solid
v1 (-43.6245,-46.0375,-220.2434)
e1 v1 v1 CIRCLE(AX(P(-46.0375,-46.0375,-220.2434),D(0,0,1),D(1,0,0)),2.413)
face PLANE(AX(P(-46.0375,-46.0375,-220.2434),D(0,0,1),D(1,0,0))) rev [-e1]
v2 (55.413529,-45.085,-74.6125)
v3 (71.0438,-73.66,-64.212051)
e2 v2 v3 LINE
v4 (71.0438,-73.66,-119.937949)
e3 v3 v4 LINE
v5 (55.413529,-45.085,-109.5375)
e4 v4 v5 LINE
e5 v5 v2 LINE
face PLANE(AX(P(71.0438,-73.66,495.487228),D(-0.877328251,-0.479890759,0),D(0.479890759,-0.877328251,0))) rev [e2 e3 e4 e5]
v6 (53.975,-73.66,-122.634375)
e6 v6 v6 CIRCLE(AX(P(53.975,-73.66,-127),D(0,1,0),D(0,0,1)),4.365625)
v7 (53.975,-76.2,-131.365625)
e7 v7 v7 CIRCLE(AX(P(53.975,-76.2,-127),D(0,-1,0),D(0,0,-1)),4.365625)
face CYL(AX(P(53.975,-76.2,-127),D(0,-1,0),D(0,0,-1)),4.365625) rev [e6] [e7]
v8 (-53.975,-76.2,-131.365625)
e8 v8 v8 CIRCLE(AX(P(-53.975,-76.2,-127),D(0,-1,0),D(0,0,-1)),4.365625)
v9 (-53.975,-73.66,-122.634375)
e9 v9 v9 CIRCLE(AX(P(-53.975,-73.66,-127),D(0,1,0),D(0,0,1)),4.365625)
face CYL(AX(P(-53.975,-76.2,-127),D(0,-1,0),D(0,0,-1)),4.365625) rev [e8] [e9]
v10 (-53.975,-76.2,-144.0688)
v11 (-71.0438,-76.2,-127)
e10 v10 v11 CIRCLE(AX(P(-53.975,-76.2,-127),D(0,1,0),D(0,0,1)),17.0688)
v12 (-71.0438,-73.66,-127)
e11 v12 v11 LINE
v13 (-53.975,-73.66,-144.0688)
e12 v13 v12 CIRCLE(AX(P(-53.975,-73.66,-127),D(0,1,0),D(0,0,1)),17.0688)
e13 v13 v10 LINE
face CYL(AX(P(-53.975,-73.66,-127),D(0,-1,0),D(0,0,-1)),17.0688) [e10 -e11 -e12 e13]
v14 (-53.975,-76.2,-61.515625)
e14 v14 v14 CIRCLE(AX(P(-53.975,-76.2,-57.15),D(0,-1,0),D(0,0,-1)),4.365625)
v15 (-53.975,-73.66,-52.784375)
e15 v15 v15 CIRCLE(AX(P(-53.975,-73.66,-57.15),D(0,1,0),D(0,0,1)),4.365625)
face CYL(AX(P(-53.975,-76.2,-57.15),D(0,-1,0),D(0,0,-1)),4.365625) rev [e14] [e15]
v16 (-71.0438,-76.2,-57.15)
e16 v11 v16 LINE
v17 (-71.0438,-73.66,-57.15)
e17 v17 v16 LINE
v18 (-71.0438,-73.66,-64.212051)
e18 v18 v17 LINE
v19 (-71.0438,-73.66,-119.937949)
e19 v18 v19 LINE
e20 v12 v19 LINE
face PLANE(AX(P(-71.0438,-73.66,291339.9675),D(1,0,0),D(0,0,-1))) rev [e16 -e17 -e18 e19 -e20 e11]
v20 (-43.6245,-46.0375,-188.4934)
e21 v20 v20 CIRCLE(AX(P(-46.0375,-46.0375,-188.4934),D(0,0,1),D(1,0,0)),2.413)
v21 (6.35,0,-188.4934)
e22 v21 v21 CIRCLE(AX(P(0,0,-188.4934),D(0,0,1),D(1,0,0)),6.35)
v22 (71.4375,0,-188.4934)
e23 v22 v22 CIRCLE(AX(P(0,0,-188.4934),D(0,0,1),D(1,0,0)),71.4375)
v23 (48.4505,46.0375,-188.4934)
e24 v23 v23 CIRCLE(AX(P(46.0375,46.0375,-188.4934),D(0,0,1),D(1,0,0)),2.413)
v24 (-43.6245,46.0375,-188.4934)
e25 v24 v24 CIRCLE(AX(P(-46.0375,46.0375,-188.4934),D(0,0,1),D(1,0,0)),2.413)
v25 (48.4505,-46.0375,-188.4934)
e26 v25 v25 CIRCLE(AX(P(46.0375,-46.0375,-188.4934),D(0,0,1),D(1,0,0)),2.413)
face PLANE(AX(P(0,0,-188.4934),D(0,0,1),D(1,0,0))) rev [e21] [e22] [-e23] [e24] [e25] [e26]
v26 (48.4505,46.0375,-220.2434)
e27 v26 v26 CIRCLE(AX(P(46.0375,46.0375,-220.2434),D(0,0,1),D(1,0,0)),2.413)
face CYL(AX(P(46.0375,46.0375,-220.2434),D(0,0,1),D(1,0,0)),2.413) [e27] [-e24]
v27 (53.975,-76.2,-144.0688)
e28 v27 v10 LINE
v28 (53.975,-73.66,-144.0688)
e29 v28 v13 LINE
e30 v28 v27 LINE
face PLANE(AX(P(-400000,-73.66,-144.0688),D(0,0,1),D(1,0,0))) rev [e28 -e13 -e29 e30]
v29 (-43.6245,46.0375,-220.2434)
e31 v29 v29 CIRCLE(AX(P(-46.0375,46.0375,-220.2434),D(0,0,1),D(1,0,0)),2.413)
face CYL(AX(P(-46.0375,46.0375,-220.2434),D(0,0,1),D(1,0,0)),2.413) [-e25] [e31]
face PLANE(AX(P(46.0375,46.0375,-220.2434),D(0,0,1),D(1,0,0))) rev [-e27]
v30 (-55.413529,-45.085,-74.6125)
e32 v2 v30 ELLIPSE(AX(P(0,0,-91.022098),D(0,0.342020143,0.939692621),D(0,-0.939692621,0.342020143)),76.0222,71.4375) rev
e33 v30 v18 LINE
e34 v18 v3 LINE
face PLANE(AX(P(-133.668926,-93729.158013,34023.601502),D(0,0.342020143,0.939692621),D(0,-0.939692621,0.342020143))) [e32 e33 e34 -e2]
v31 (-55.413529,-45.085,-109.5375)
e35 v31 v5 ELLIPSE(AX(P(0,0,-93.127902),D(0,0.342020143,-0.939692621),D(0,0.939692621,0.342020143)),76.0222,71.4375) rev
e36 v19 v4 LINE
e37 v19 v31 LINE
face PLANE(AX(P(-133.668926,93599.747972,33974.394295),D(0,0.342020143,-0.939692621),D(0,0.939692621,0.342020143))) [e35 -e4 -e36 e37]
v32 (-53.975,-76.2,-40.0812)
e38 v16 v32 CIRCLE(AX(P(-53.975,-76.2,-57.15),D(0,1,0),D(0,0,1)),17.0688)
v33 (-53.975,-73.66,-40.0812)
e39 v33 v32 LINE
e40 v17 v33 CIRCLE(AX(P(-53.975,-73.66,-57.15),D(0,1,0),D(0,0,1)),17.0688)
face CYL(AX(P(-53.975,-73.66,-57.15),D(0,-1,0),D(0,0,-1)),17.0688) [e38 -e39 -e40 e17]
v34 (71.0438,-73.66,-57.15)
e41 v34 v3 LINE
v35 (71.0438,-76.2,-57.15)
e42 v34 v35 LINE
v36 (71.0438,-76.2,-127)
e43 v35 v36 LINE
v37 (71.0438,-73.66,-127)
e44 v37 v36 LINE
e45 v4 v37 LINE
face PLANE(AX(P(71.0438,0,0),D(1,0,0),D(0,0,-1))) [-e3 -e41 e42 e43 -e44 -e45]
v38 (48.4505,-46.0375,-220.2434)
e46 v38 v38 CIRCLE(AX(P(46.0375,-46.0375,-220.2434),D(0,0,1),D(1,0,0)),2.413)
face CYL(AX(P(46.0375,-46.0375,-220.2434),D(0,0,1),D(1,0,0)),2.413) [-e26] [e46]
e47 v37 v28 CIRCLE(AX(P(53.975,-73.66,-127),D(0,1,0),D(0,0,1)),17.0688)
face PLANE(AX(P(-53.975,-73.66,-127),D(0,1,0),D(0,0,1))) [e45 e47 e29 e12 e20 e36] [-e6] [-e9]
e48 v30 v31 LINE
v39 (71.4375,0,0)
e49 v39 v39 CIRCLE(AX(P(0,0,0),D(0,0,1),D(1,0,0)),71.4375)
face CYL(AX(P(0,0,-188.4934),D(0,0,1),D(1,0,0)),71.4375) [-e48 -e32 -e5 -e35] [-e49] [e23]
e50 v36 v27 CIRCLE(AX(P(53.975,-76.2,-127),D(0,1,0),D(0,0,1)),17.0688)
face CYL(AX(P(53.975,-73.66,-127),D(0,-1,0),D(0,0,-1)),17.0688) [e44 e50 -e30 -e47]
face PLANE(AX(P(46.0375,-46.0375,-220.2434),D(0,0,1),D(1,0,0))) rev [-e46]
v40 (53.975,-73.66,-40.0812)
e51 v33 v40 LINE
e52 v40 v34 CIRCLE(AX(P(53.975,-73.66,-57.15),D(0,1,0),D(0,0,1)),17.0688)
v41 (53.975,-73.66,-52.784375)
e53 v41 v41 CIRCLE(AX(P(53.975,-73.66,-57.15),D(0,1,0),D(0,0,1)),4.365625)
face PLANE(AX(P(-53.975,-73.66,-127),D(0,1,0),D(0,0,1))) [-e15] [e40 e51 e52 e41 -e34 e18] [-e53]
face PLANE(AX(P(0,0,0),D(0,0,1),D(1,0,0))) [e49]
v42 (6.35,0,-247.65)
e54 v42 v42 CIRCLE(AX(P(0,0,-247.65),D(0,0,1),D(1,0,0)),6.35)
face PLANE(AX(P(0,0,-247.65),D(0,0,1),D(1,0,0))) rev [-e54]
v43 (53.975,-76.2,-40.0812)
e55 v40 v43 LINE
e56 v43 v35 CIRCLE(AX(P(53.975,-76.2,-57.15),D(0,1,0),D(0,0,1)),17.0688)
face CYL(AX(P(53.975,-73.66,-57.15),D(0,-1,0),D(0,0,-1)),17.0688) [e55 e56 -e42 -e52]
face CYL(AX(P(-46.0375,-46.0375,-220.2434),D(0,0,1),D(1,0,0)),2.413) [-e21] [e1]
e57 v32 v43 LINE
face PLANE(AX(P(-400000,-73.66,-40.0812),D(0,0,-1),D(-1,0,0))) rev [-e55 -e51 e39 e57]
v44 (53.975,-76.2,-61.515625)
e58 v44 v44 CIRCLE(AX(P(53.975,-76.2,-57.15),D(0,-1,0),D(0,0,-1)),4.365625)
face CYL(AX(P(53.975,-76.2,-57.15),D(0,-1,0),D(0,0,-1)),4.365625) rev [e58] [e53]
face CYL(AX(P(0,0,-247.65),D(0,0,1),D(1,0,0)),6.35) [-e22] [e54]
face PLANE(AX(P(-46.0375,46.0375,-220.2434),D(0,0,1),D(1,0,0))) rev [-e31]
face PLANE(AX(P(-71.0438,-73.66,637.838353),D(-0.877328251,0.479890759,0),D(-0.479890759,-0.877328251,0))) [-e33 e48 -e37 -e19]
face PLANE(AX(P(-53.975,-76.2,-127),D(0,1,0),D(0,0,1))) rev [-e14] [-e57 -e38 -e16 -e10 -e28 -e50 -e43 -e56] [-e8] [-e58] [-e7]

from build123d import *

# Parameters (mm, degrees)
SKETCH2_R                                 = 71.4375
BOSS_EXTRUDE1_DEPTH                       = 188.4934
BOSS_EXTRUDE4_START                       = -188.4934
SKETCH2_3_R                               = 6.35
BOSS_EXTRUDE4_DEPTH                       = 59.1566
BOSS_EXTRUDE2_START                       = -76.2
BOSS_EXTRUDE2_DEPTH                       = 2.54
SKETCH5_W                                 = 4.365625
SKETCH5_H                                 = 147.6375
F_11_32_0_34375_DIAMETER_HOLE1_AT_2_COUNT = 2
F_11_32_0_34375_DIAMETER_HOLE1_AT_2_PITCH = 69.85
F_11_32_0_34375_DIAMETER_HOLE1_AT_3_COUNT = 2
F_11_32_0_34375_DIAMETER_HOLE1_AT_3_PITCH = 128.577700244
F_11_32_0_34375_DIAMETER_HOLE1_AT_4_COUNT = 2
F_11_32_0_34375_DIAMETER_HOLE1_AT_4_PITCH = 107.95
BOSS_EXTRUDE3_START                       = 71.0438
BOSS_EXTRUDE3_DEPTH                       = 142.0876
CUT_EXTRUDE1_START                        = -119.937949444
CUT_EXTRUDE1_DEPTH                        = 55.725898888
BOSS_EXTRUDE5_START                       = -188.4934
SKETCH8_R                                 = 2.413
BOSS_EXTRUDE5_DEPTH                       = 31.75


# Read off the part's stored shape, not the designer's step: Cut-Extrude1
with BuildPart() as part:
    # Sketch2 → Boss-Extrude1 (new body)
    with BuildSketch(Plane.XY):
        Circle(SKETCH2_R)
    extrude(amount=-BOSS_EXTRUDE1_DEPTH)

    # Sketch2<3> → Boss-Extrude4 (add)
    with BuildSketch(Plane.XY.offset(BOSS_EXTRUDE4_START)):
        Circle(SKETCH2_3_R)
    extrude(amount=-BOSS_EXTRUDE4_DEPTH)



with BuildPart() as body_2:
    # Sketch3 → Boss-Extrude2 (new body)
    with BuildSketch(Plane(origin=(0, 0, 0), x_dir=(1, 0, 0), z_dir=(0, 1, 0)).offset(BOSS_EXTRUDE2_START)):
        with BuildLine():
            Line((-53.975, 144.0688), (53.975, 144.0688))
            ThreePointArc((53.975, 144.0688), (66.044464227, 139.069464227), (71.0438, 127))
            Line((71.0438, 127), (71.0438, 57.15))
            ThreePointArc((71.0438, 57.15), (66.044464227, 45.080535773), (53.975, 40.0812))
            Line((53.975, 40.0812), (-53.975, 40.0812))
            ThreePointArc((-53.975, 40.0812), (-66.044464227, 45.080535773), (-71.0438, 57.15))
            Line((-71.0438, 57.15), (-71.0438, 127))
            ThreePointArc((-71.0438, 127), (-66.044464227, 139.069464227), (-53.975, 144.0688))
        make_face()
    extrude(amount=BOSS_EXTRUDE2_DEPTH)

    # Sketch5 → 11/32 (0.34375) Diameter Hole1 (revolve, cut)
    with BuildSketch(Plane(origin=(-53.975, -76.2, -127), x_dir=(0, 0, -1), z_dir=(1, 0, 0))):
        with Locations((2.1828125, 73.81875)):
            Rectangle(SKETCH5_W, SKETCH5_H)
    f_11_32_0_34375_diameter_hole1 = revolve(axis=Axis((-53.975, -82.55, -127), (0, 1, 0)), mode=Mode.SUBTRACT)

    # 11/32 (0.34375) Diameter Hole1 at 2: 11/32 (0.34375) Diameter Hole1 ×2
    with Locations(*[(0, 0, i * F_11_32_0_34375_DIAMETER_HOLE1_AT_2_PITCH) for i in range(1, F_11_32_0_34375_DIAMETER_HOLE1_AT_2_COUNT)]):
        add(f_11_32_0_34375_diameter_hole1, mode=Mode.SUBTRACT)

    # 11/32 (0.34375) Diameter Hole1 at 3: 11/32 (0.34375) Diameter Hole1 ×2
    with Locations(*[Vector(0.8395701571521513, 0, 0.543251278157274) * (i * F_11_32_0_34375_DIAMETER_HOLE1_AT_3_PITCH) for i in range(1, F_11_32_0_34375_DIAMETER_HOLE1_AT_3_COUNT)]):
        add(f_11_32_0_34375_diameter_hole1, mode=Mode.SUBTRACT)

    # 11/32 (0.34375) Diameter Hole1 at 4: 11/32 (0.34375) Diameter Hole1 ×2
    with Locations(*[(i * F_11_32_0_34375_DIAMETER_HOLE1_AT_4_PITCH, 0, 0) for i in range(1, F_11_32_0_34375_DIAMETER_HOLE1_AT_4_COUNT)]):
        add(f_11_32_0_34375_diameter_hole1, mode=Mode.SUBTRACT)


with BuildPart() as part_1:
    add(part.part)

    add(body_2.part)  # Boss-Extrude3 merges body 2
    # Sketch6 → Boss-Extrude3 (add)
    with BuildSketch(Plane(origin=(0, 0, 0), x_dir=(0, 0, -1), z_dir=(1, 0, 0)).offset(BOSS_EXTRUDE3_START)):
        Polygon((64.212050556, -73.66), (74.6125, -45.085), (109.5375, -45.085), (119.937949444, -73.66), align=None)
    extrude(amount=-BOSS_EXTRUDE3_DEPTH)

    # Cut-Extrude1 outline → Cut-Extrude1 (cut)
    with BuildSketch(Plane.XY.offset(CUT_EXTRUDE1_START)):
        Polygon((-71.0438, -73.66), (-55.413528865, -45.085), (-71.0438, -45.085), align=None)
    cut_extrude1 = extrude(amount=CUT_EXTRUDE1_DEPTH, mode=Mode.SUBTRACT)

    # Mirror2: Cut-Extrude1 across plane
    add(cut_extrude1.mirror(Plane(origin=(0, 0, 0), x_dir=(0, 0, 1), z_dir=(1, 0, 0))), mode=Mode.SUBTRACT)

    # Sketch8 → Boss-Extrude5 (add)
    with BuildSketch(Plane.XY.offset(BOSS_EXTRUDE5_START)):
        with Locations((46.0375, -46.0375)):
            Circle(SKETCH8_R)
        with Locations((46.0375, 46.0375)):
            Circle(SKETCH8_R)
        with Locations((-46.0375, 46.0375)):
            Circle(SKETCH8_R)
        with Locations((-46.0375, -46.0375)):
            Circle(SKETCH8_R)
    extrude(amount=-BOSS_EXTRUDE5_DEPTH)


solid = part_1.part
